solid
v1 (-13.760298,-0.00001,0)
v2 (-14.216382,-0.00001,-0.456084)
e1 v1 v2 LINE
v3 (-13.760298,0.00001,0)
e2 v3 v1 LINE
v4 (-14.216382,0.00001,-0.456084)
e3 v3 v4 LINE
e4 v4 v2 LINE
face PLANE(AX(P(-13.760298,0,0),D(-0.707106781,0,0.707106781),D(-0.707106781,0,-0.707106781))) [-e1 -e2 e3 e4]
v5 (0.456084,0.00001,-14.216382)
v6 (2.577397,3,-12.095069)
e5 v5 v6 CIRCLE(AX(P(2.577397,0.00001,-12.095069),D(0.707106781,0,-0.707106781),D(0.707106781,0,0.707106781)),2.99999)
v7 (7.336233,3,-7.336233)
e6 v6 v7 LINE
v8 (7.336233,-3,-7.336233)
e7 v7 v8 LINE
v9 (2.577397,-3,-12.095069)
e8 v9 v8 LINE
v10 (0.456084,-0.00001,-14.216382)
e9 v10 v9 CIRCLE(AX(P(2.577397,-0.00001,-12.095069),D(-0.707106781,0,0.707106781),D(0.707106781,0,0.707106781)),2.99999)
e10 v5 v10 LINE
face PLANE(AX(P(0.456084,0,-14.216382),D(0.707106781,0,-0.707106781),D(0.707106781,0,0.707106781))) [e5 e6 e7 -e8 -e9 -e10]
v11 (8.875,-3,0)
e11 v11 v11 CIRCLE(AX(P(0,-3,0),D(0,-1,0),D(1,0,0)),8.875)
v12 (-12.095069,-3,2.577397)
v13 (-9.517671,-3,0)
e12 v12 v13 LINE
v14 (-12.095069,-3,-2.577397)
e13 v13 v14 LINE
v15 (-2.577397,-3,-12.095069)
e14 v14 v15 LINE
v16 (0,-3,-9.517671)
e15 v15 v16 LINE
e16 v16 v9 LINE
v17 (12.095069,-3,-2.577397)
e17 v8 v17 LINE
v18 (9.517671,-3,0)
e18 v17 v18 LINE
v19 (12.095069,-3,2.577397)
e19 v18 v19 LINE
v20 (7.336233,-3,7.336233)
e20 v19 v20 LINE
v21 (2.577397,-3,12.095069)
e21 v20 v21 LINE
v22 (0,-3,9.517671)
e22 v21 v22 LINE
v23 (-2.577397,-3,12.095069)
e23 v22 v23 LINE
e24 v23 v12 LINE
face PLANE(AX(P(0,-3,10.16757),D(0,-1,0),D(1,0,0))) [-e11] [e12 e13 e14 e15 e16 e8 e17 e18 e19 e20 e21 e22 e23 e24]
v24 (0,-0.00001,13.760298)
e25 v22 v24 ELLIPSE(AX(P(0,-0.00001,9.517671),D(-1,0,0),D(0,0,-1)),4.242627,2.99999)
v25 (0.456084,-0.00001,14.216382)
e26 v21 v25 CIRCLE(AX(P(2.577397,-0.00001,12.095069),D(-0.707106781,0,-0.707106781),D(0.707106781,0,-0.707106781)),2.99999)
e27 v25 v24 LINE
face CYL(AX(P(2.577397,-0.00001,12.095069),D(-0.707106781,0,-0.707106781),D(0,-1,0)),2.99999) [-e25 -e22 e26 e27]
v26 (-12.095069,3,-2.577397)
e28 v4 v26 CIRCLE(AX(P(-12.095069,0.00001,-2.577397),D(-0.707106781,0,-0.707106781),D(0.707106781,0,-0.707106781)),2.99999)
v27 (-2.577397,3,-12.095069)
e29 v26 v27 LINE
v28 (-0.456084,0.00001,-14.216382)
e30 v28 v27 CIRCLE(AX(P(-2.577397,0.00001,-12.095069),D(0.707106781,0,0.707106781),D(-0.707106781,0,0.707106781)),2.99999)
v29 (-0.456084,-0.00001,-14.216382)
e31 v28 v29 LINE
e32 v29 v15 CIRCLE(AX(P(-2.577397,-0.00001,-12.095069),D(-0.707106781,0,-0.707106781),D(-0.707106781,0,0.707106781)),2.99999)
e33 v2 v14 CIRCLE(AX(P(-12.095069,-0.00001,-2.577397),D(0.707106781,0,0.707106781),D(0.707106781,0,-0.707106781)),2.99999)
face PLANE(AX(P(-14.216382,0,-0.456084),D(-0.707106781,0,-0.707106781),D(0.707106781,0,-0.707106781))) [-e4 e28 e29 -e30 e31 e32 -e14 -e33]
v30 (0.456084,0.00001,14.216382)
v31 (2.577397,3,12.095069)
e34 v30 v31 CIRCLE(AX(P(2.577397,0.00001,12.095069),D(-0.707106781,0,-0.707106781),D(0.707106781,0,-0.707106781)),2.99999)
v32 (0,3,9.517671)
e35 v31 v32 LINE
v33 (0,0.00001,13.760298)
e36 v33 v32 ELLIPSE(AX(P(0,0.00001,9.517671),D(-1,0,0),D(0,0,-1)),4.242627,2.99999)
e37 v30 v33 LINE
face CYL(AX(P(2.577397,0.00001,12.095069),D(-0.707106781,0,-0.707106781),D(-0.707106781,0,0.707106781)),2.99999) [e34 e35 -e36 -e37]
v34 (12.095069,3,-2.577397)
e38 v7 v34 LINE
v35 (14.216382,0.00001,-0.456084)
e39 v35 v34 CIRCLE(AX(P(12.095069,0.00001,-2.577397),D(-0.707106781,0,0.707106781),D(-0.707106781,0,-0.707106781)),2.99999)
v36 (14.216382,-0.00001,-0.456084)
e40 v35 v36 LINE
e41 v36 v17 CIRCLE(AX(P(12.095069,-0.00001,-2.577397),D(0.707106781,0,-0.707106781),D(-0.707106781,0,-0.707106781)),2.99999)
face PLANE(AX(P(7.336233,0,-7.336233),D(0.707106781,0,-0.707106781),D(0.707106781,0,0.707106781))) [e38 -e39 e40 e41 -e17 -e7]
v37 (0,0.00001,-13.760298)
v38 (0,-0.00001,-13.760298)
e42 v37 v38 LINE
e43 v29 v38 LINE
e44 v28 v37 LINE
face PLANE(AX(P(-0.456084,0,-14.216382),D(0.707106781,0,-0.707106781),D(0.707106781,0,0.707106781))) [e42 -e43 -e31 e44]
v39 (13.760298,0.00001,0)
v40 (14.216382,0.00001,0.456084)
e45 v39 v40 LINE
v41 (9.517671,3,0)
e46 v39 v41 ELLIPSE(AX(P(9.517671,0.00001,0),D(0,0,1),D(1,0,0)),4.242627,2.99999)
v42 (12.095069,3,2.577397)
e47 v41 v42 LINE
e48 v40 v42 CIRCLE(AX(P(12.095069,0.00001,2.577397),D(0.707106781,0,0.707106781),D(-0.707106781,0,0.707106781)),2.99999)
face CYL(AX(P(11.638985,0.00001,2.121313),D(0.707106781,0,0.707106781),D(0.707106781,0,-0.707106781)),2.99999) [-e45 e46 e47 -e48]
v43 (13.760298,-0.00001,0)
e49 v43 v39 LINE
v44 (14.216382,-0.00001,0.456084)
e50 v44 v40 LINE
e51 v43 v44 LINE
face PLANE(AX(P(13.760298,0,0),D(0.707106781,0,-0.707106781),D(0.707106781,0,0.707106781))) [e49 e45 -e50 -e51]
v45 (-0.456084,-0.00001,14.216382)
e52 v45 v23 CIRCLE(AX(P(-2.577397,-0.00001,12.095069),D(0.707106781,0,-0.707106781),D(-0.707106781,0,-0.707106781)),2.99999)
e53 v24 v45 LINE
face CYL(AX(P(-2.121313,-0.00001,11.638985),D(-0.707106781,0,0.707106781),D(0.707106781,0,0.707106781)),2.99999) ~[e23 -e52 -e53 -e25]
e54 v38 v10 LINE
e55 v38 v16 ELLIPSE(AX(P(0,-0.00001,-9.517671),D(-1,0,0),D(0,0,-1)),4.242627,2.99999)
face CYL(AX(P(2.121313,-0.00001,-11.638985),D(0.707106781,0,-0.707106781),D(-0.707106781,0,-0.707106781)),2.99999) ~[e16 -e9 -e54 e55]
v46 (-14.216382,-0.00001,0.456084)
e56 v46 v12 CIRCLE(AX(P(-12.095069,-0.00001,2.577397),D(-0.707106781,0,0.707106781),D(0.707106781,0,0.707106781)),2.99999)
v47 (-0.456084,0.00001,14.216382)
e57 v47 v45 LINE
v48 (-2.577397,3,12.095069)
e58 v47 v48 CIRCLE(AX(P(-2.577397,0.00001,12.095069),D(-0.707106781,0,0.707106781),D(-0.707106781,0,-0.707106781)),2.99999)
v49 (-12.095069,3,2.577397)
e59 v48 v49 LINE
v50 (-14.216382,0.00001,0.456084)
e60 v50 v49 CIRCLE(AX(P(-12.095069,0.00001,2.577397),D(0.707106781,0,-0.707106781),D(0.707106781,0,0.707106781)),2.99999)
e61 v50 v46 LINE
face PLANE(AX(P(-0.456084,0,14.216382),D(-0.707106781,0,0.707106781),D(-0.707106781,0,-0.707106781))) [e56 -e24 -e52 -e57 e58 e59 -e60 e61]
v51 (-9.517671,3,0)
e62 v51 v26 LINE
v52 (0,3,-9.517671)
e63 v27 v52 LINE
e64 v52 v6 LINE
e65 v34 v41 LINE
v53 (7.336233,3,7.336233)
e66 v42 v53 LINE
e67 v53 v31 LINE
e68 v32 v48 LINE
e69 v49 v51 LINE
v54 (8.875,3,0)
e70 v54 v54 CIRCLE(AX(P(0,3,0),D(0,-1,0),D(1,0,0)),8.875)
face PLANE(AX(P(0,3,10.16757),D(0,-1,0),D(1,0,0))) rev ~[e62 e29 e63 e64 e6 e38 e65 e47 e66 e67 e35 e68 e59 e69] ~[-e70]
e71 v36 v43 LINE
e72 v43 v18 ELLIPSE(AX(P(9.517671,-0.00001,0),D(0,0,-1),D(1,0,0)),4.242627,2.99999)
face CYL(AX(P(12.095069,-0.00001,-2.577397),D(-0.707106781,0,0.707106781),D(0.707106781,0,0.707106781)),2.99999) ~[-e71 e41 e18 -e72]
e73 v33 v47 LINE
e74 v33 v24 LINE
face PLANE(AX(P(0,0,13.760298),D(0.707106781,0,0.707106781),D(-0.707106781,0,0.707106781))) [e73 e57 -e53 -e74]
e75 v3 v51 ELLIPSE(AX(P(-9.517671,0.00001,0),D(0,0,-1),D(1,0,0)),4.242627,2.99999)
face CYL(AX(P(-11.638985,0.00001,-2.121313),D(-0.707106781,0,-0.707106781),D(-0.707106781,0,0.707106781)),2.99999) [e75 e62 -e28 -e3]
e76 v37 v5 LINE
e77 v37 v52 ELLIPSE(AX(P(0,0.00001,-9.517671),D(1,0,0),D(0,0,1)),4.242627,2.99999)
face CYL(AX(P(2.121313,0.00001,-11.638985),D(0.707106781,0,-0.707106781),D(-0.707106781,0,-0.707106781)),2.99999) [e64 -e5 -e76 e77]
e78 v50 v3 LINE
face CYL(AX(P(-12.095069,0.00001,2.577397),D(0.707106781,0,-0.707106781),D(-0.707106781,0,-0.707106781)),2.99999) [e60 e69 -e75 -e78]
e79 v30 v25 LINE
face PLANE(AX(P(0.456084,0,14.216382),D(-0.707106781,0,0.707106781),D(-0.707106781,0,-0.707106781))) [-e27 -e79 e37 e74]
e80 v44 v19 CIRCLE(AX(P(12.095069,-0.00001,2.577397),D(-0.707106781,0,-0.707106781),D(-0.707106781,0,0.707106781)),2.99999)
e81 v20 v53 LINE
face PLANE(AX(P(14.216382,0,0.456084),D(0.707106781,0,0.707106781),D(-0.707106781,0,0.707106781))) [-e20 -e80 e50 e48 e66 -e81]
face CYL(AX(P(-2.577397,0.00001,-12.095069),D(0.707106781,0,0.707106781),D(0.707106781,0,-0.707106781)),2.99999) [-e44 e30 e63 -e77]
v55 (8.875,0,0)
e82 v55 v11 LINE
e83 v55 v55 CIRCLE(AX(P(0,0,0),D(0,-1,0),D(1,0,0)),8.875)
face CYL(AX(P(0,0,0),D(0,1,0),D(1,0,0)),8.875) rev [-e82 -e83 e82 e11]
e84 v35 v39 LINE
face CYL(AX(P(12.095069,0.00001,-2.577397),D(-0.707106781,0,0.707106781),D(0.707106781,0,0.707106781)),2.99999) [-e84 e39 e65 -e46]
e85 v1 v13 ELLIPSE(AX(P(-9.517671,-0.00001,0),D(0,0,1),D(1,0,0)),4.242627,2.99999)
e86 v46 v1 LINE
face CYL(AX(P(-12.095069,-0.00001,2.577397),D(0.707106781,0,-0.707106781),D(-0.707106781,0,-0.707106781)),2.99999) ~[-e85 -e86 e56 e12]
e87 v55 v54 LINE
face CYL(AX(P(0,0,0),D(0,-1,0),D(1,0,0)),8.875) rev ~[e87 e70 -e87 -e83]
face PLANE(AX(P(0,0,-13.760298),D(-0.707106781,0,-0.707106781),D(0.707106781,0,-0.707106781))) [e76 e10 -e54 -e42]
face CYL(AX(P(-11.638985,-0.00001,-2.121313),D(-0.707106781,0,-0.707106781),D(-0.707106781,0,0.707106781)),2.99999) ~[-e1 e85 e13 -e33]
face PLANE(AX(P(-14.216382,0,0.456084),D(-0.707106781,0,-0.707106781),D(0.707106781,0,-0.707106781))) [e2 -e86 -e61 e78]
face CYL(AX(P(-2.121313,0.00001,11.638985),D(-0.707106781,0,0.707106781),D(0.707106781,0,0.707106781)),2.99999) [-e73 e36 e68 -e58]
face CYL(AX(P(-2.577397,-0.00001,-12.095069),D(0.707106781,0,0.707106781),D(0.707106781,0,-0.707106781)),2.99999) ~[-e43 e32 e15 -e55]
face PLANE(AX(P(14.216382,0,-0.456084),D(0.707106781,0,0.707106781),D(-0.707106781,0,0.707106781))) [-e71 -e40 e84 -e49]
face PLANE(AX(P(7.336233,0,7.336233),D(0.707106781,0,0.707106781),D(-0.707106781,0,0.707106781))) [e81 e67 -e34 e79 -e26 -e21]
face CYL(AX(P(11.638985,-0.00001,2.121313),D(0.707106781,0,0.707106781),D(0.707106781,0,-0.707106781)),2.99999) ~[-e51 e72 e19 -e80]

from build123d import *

# Parameters (mm, degrees)
F0_R          = 8.875
F1_DEPTH      = 3
F1_DEPTH_BACK = 3
F2_R          = 2.99999


# Not quite as in the source:
# - a fillet or chamfer is up to 0.001 mm smaller than in the source, because OpenCascade refuses the exact size


with BuildPart() as f1:
    # F0 (on Front) → F1 (new body, two sides)
    with BuildSketch(Plane.XZ) as f1_sk:
        with BuildLine():
            ThreePointArc((-7.3362328356, 7.3362328741), (1.36e-08, 10.375), (7.3362328548, 7.3362328548))
            Line((7.3362328548, 7.3362328548), (0.4560838739, 14.2163818358))
            Line((0.4560838739, 14.2163818358), (0, 13.7602979619))
            Line((0, 13.7602979619), (-0.4560838739, 14.2163818358))
            Line((-0.4560838739, 14.2163818358), (-7.3362328356, 7.3362328741))
        make_face()
        with BuildLine():
            ThreePointArc((-7.3362328073, -7.3362329024), (-10.375, -2e-08), (-7.3362328356, 7.3362328741))
            Line((-7.3362328356, 7.3362328741), (-14.2163818358, 0.4560838739))
            Line((-14.2163818358, 0.4560838739), (-13.7602979619, 0))
            Line((-13.7602979619, 0), (-14.2163818358, -0.4560838739))
            Line((-14.2163818358, -0.4560838739), (-7.3362328073, -7.3362329024))
        make_face()
        with BuildLine():
            ThreePointArc((7.3362328617, -7.3362328479), (9.5852501517, -3.9703406063), (10.375, 0))
            ThreePointArc((10.375, 0), (9.5852501498, 3.9703406108), (7.3362328548, 7.3362328548))
            ThreePointArc((7.3362328548, 7.3362328548), (1.36e-08, 10.375), (-7.3362328356, 7.3362328741))
            ThreePointArc((-7.3362328356, 7.3362328741), (-10.375, -2e-08), (-7.3362328073, -7.3362329024))
            ThreePointArc((-7.3362328073, -7.3362329024), (3.85e-08, -10.375), (7.3362328617, -7.3362328479))
        make_face()
        Circle(F0_R, mode=Mode.SUBTRACT)
        with BuildLine():
            ThreePointArc((7.3362328548, 7.3362328548), (9.5852501498, 3.9703406108), (10.375, 0))
            ThreePointArc((10.375, 0), (9.5852501517, -3.9703406063), (7.3362328617, -7.3362328479))
            Line((7.3362328617, -7.3362328479), (14.2163818358, -0.4560838739))
            Line((14.2163818358, -0.4560838739), (13.7602979619, 0))
            Line((13.7602979619, 0), (14.2163818358, 0.4560838739))
            Line((14.2163818358, 0.4560838739), (7.3362328548, 7.3362328548))
        make_face()
        with BuildLine():
            Line((0.4560838739, -14.2163818358), (7.3362328617, -7.3362328479))
            ThreePointArc((7.3362328617, -7.3362328479), (3.85e-08, -10.375), (-7.3362328073, -7.3362329024))
            Line((-7.3362328073, -7.3362329024), (-0.4560838739, -14.2163818358))
            Line((-0.4560838739, -14.2163818358), (0, -13.7602979619))
            Line((0, -13.7602979619), (0.4560838739, -14.2163818358))
        make_face()
    extrude(amount=F1_DEPTH)
    extrude(f1_sk.sketch, amount=-F1_DEPTH_BACK)

    # F2 (radius 3 in the source; OpenCascade refuses exactly that, so slightly less here)
    f2_edges = [f1.edges().sort_by_distance(p)[0] for p in [
        (0.228042, -3, 13.98834),
        (-0.228042, -3, 13.98834),
        (13.98834, -3, 0.228042),
        (13.98834, -3, -0.228042),
        (0.228042, -3, -13.98834),
        (-0.228042, -3, -13.98834),
        (-13.98834, -3, 0.228042),
        (-13.98834, -3, -0.228042),
        (-13.98834, 3, 0.228042),
        (-13.98834, 3, -0.228042),
        (-0.228042, 3, -13.98834),
        (0.228042, 3, -13.98834),
        (13.98834, 3, 0.228042),
        (13.98834, 3, -0.228042),
        (0.228042, 3, 13.98834),
        (-0.228042, 3, 13.98834),
    ]]
    fillet(f2_edges, radius=F2_R)


solid = f1.part
